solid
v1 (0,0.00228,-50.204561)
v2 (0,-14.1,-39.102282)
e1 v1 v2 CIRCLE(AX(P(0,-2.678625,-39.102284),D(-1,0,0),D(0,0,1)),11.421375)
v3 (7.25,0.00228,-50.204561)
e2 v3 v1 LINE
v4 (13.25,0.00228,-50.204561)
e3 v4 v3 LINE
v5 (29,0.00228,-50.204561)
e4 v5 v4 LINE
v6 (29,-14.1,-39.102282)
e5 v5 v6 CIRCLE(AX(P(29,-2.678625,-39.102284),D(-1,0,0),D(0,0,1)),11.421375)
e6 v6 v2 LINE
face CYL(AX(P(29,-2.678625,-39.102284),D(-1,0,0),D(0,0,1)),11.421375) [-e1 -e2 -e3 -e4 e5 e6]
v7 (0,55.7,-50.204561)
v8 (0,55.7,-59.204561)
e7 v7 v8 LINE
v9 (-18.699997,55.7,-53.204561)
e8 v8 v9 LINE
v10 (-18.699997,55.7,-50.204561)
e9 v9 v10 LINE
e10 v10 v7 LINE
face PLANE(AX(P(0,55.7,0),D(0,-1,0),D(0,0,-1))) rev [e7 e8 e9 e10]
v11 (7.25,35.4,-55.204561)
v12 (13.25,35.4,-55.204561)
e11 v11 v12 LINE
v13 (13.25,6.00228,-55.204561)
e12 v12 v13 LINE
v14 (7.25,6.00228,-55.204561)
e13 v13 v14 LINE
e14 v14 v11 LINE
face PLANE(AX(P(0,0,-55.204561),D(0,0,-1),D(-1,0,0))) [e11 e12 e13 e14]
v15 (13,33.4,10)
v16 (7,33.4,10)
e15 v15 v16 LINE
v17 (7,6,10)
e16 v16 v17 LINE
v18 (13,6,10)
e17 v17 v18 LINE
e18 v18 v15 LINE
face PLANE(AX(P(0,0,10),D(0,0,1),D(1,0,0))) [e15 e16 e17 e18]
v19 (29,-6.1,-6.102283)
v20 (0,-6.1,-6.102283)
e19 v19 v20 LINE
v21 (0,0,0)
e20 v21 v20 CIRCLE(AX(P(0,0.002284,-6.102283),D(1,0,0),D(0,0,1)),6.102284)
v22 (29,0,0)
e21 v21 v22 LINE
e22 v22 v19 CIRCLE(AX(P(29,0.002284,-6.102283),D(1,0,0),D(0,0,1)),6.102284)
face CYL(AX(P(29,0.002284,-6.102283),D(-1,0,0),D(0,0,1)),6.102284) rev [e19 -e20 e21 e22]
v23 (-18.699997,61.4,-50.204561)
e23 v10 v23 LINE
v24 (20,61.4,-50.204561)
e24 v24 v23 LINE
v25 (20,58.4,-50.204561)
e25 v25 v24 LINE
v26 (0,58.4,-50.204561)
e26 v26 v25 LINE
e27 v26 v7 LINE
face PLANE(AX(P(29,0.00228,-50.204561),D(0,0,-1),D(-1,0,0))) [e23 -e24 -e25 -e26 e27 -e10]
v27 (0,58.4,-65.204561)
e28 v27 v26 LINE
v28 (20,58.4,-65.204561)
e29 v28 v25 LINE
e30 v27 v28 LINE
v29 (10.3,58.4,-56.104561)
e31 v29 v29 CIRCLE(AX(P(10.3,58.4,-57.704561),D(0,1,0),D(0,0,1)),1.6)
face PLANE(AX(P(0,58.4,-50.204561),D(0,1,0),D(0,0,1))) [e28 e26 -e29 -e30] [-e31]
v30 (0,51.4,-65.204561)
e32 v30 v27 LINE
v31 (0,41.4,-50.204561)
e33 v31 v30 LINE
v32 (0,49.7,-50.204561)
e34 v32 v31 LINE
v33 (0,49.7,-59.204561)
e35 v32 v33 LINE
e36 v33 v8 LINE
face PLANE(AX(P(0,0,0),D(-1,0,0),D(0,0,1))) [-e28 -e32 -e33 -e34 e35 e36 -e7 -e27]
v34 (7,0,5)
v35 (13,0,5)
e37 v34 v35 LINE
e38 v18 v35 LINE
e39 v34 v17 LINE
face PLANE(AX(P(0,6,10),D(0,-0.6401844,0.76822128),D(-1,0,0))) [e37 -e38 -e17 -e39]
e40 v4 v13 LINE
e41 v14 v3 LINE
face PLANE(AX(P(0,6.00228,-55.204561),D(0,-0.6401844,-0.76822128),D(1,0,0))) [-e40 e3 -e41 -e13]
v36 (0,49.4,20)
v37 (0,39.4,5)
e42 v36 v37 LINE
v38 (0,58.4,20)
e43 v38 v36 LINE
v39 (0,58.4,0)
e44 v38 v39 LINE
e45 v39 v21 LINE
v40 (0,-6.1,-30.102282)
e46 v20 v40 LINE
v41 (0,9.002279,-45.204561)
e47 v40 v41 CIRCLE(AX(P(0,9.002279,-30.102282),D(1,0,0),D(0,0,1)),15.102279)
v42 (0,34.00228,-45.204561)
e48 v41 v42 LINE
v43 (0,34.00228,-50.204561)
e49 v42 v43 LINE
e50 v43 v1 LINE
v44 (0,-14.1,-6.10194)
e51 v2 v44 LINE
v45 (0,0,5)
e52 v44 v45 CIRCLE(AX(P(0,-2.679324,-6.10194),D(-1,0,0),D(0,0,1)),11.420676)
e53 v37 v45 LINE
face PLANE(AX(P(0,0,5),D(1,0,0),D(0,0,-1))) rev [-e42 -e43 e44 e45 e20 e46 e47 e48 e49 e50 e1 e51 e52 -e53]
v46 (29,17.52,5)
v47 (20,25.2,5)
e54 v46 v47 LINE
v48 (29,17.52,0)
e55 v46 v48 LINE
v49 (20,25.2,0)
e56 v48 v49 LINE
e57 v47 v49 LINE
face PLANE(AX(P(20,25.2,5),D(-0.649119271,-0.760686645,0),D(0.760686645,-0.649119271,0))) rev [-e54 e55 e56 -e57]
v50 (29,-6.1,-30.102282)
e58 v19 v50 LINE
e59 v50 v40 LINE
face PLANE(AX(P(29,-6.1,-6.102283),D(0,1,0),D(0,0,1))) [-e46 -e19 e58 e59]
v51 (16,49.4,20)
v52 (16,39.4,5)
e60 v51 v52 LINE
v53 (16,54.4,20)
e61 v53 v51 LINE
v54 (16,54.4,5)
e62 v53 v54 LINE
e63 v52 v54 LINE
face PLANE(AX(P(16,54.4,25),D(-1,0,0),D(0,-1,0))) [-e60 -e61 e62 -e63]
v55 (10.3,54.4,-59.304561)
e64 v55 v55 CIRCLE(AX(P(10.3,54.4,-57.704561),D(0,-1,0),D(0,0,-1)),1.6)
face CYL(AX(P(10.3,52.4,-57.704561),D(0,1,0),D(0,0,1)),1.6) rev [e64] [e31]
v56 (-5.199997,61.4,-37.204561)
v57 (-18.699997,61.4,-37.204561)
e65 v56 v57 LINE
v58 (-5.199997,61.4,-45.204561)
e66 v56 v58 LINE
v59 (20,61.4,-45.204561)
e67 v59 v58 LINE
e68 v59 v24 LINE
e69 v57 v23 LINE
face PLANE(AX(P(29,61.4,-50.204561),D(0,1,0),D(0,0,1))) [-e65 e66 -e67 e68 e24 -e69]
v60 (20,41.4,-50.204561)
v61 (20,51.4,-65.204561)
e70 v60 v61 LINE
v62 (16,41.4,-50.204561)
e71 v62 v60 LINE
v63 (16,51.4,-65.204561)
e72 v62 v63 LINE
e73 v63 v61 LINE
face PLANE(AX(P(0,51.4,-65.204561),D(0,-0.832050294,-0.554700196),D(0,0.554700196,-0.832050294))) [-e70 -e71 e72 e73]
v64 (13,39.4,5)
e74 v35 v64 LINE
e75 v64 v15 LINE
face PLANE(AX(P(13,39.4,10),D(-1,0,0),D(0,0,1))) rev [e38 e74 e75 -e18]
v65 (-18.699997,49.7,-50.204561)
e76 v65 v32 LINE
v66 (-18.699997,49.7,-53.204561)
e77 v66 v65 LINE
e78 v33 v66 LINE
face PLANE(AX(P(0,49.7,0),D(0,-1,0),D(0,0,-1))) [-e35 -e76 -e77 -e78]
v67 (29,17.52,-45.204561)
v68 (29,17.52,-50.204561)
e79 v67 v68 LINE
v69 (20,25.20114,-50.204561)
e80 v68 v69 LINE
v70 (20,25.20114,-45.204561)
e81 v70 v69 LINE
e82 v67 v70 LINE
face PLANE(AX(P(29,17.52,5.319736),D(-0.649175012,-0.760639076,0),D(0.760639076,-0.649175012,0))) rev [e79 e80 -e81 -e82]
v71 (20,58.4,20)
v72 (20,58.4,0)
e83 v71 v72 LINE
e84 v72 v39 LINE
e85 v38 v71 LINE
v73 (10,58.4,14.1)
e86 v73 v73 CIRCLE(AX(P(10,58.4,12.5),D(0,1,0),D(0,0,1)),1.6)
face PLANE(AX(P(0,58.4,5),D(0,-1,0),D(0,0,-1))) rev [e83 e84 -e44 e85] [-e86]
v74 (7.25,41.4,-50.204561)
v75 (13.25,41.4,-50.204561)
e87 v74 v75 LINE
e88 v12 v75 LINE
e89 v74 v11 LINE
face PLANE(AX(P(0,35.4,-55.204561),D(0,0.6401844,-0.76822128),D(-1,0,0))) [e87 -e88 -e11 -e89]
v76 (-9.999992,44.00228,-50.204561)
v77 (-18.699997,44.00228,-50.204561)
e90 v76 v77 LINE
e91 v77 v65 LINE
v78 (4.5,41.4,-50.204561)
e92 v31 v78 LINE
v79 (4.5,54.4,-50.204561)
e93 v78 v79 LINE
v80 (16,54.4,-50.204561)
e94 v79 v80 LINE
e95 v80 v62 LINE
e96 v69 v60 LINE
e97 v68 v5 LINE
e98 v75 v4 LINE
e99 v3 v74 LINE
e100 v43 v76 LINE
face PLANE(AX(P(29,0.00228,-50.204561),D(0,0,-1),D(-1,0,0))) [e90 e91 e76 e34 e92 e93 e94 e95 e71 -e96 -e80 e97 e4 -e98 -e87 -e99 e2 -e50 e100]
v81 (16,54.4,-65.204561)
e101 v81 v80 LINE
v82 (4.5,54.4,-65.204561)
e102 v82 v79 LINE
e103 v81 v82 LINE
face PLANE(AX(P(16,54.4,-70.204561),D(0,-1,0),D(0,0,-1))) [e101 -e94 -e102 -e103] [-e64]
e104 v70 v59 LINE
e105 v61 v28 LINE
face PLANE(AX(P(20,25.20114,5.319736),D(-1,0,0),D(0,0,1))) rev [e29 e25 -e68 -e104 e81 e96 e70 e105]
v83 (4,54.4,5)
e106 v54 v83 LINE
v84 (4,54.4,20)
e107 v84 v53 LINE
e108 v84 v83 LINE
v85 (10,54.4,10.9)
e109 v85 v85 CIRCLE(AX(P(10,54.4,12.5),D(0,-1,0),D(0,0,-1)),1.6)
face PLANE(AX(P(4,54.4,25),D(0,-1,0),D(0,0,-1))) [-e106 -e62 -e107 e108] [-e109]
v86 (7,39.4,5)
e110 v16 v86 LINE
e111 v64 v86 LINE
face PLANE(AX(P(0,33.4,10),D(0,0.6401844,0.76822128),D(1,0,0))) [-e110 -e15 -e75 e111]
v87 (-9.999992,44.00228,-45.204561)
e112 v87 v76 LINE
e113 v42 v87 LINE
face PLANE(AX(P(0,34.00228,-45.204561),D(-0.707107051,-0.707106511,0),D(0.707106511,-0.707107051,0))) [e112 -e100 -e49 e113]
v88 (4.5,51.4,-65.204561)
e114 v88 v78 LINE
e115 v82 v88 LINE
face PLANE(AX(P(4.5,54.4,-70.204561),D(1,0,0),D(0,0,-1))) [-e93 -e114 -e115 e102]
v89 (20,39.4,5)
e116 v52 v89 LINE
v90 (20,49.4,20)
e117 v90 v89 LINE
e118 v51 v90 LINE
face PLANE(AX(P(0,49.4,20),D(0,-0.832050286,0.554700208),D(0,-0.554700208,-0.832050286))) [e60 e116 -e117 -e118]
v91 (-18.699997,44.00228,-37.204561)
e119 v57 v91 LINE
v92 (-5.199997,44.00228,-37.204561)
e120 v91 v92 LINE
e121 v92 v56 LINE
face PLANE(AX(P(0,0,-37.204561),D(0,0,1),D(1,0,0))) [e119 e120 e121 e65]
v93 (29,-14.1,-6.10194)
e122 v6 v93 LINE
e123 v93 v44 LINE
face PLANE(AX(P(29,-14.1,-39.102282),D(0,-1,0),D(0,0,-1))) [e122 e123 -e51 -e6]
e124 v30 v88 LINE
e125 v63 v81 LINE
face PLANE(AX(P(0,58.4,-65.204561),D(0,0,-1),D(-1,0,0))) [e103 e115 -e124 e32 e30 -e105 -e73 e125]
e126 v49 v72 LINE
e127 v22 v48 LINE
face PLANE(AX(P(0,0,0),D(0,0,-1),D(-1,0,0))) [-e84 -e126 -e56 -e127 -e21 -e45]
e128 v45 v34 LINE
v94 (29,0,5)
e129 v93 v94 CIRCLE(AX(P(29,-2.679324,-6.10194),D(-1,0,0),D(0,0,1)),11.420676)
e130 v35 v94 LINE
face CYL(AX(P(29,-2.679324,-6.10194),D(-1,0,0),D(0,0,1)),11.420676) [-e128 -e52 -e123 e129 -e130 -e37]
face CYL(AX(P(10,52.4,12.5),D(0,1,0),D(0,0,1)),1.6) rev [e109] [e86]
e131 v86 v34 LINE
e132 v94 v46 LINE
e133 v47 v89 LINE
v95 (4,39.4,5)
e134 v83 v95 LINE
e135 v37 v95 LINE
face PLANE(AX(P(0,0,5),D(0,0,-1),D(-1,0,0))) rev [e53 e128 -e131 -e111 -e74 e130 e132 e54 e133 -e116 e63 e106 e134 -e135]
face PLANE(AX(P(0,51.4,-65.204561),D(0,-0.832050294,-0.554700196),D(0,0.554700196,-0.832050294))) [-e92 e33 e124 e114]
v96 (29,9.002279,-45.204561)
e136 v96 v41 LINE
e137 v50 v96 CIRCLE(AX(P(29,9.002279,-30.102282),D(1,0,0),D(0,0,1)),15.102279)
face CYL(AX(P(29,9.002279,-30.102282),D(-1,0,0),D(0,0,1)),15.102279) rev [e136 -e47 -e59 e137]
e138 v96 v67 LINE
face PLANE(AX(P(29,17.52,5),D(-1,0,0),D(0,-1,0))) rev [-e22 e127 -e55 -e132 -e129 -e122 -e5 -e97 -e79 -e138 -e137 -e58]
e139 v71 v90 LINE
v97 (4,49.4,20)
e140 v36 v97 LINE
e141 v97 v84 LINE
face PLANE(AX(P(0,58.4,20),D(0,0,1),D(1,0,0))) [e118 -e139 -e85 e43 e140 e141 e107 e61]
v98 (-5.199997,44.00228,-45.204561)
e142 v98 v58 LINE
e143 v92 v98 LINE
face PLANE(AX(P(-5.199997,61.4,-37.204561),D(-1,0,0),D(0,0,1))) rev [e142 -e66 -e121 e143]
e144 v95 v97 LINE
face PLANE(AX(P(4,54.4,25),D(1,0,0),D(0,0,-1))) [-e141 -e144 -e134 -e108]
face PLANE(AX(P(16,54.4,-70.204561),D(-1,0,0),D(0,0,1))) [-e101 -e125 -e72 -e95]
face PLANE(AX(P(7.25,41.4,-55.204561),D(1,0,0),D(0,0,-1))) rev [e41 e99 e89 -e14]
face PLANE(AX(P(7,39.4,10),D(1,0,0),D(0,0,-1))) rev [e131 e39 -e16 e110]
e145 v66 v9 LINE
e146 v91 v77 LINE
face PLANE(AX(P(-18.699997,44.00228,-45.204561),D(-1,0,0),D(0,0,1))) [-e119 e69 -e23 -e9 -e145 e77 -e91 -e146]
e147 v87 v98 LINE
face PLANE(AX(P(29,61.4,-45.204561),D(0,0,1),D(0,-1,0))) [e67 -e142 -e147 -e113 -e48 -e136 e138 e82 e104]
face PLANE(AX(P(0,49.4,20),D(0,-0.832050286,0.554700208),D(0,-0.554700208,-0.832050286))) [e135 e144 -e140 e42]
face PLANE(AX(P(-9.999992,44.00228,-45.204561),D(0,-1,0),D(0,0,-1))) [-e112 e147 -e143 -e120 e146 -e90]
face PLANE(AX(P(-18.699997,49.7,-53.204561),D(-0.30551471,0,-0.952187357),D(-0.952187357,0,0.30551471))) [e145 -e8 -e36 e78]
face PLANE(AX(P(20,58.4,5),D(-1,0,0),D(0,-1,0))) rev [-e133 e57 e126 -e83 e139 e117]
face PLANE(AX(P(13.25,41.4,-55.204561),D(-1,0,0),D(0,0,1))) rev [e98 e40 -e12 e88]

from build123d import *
from OCP.BRepFilletAPI import BRepFilletAPI_MakeChamfer

# Parameters (mm, degrees)
RESSALTO_EXTRUS_O1_DEPTH = 5
RESSALTO_EXTRUS_O2_DEPTH = 29
CORTE_EXTRUS_O1_REACH    = 89.714
RESSALTO_EXTRUS_O3_DEPTH = 5
ESBO_O5_W                = 13.5
ESBO_O5_H                = 17.397720337
RESSALTO_EXTRUS_O4_DEPTH = 8
RESSALTO_EXTRUS_O5_DEPTH = 20
ESBO_O7_W                = 11.5
ESBO_O7_H                = 13
CORTE_EXTRUS_O2_DEPTH    = 20
RESSALTO_EXTRUS_O6_DEPTH = 20
ESBO_O9_W                = 12
ESBO_O9_H                = 15
CORTE_EXTRUS_O3_DEPTH    = 20
ESBO_O11_W               = 6
ESBO_O11_H               = 39.4
RESSALTO_EXTRUS_O7_DEPTH = 5
ESBO_O12_W               = 6
ESBO_O12_H               = 41.397720337
RESSALTO_EXTRUS_O8_DEPTH = 5
CHANFRO1_SIZE            = 5
CHANFRO1_SIZE_2          = 6
RESSALTO_EXTRUS_O9_START = -5.7
RESSALTO_EXTRUS_O9_DEPTH = 6
ESBO_O14_R               = 1.6
CORTE_EXTRUS_O4_DEPTH    = 6


with BuildPart() as part:
    # Esboço1 → Ressalto-extrusão1 (new body)
    with BuildSketch(Plane.XY):
        Polygon((0, 0), (0, 58.4), (20, 58.4), (20, 25.2), (29, 17.52), (29, 0), align=None)
    extrude(amount=RESSALTO_EXTRUS_O1_DEPTH)

    # Esboço2 → Ressalto-extrusão2 (add)
    with BuildSketch(Plane.ZY):
        with BuildLine():
            Line((0, 0), (5, 0))
            ThreePointArc((5, 0), (2.871117767, -9.744454942), (-6.101940178, -14.1))
            Line((-6.101940178, -14.1), (-39.10228157, -14.1))
            ThreePointArc((-39.10228157, -14.1), (-48.076340899, -9.74361665), (-50.204561234, 0.002279663))
            Line((-50.204561234, 0.002279663), (-50.204561234, 61.4))
            Line((-50.204561234, 61.4), (-45.204561234, 61.4))
            Line((-45.204561234, 61.4), (-45.204561234, 9.002278982))
            ThreePointArc((-45.204561234, 9.002278982), (-40.78120589, -1.676645138), (-30.10228157, -6.1))
            Line((-30.10228157, -6.1), (-6.102283186, -6.1))
            ThreePointArc((-6.102283186, -6.1), (-1.788124517, -4.313489814), (0, 0))
        make_face()
    extrude(amount=-RESSALTO_EXTRUS_O2_DEPTH)

    # Esboço3 → Corte-extrusão1 (cut, up to next)
    with BuildSketch(Plane(origin=(0, 0, -50.204561234), x_dir=(-1, 0, 0), z_dir=(0, 0, -1)), mode=Mode.PRIVATE) as corte_extrus_o1_sk1:
        Polygon((-29, 17.52), (-20, 25.201139832), (-20, 61.4), (-29, 61.4), align=None)
    corte_extrus_o1_tool1 = extrude(corte_extrus_o1_sk1.sketch, amount=-CORTE_EXTRUS_O1_REACH, mode=Mode.PRIVATE) & part.part
    add(corte_extrus_o1_tool1.solids().sort_by_distance((24.64388, 41.318887, -50.204561))[0], mode=Mode.SUBTRACT)

    # Esboço4 → Ressalto-extrusão3 (add)
    with BuildSketch(Plane(origin=(0, 0, -50.204561234), x_dir=(-1, 0, 0), z_dir=(0, 0, -1))):
        Polygon((0, 34.002279663), (9.999992371, 44.002279663), (18.699996948, 44.002279663), (18.699996948, 61.4), (0, 61.4), align=None)
    extrude(amount=-RESSALTO_EXTRUS_O3_DEPTH)

    # Esboço5 → Ressalto-extrusão4 (add)
    with BuildSketch(Plane.XY.offset(-45.204561234)):
        with Locations((-11.949996948, 52.701139832)):
            Rectangle(ESBO_O5_W, ESBO_O5_H)
    extrude(amount=RESSALTO_EXTRUS_O4_DEPTH)

    # Esboço6 → Ressalto-extrusão5 (add)
    with BuildSketch(Plane(origin=(20, 0, 0), x_dir=(0, 0, -1), z_dir=(1, 0, 0))):
        Polygon((50.204561234, 58.4), (65.204561234, 58.4), (65.204561234, 51.4), (50.204561234, 41.4), align=None)
    extrude(amount=-RESSALTO_EXTRUS_O5_DEPTH)

    # Esboço7 → Corte-extrusão2 (cut)
    with BuildSketch(Plane(origin=(0, 0, -50.204561234), x_dir=(-1, 0, 0), z_dir=(0, 0, -1))):
        with Locations((-10.25, 47.9)):
            Rectangle(ESBO_O7_W, ESBO_O7_H)
    extrude(amount=CORTE_EXTRUS_O2_DEPTH, mode=Mode.SUBTRACT)

    # Esboço8 → Ressalto-extrusão6 (add)
    with BuildSketch(Plane(origin=(20, 0, 0), x_dir=(0, 0, -1), z_dir=(1, 0, 0))):
        Polygon((-5, 58.4), (-19.999999523, 58.4), (-19.999999523, 49.4), (-5, 39.4), align=None)
    extrude(amount=-RESSALTO_EXTRUS_O6_DEPTH)

    # Esboço9 → Corte-extrusão3 (cut)
    with BuildSketch(Plane.XY.offset(5)):
        with Locations((10, 46.9)):
            Rectangle(ESBO_O9_W, ESBO_O9_H)
    extrude(amount=CORTE_EXTRUS_O3_DEPTH, mode=Mode.SUBTRACT)

    # Esboço11 → Ressalto-extrusão7 (add)
    with BuildSketch(Plane.XY.offset(5)):
        with Locations((10, 19.7)):
            Rectangle(ESBO_O11_W, ESBO_O11_H)
    extrude(amount=RESSALTO_EXTRUS_O7_DEPTH)

    # Esboço12 → Ressalto-extrusão8 (add)
    with BuildSketch(Plane(origin=(0, 0, -50.204561234), x_dir=(-1, 0, 0), z_dir=(0, 0, -1))):
        with Locations((-10.25, 20.701139832)):
            Rectangle(ESBO_O12_W, ESBO_O12_H)
    extrude(amount=RESSALTO_EXTRUS_O8_DEPTH)

    # Chanfro1
    chanfro1_edges_1 = [part.edges().sort_by_distance(p)[0] for p in [
        (10, 0, 10),
    ]]
    chanfro1_side_1 = [part.faces().sort_by_distance(p)[0] for p in [
        (10, 0, 9.9),
    ]]
    chanfro1_edges_2 = [part.edges().sort_by_distance(p)[0] for p in [
        (10, 39.4, 10),
    ]]
    chanfro1_side_2 = [part.faces().sort_by_distance(p)[0] for p in [
        (10, 39.4, 9.9),
    ]]
    chanfro1_edges_3 = [part.edges().sort_by_distance(p)[0] for p in [
        (10.25, 0.002279663, -55.204561234),
    ]]
    chanfro1_side_3 = [part.faces().sort_by_distance(p)[0] for p in [
        (10.25, 0.002279663, -55.104561234),
    ]]
    chanfro1_edges_4 = [part.edges().sort_by_distance(p)[0] for p in [
        (10.25, 41.4, -55.204561234),
    ]]
    chanfro1_side_4 = [part.faces().sort_by_distance(p)[0] for p in [
        (10.25, 41.4, -55.104561234),
    ]]
    chanfro1 = BRepFilletAPI_MakeChamfer(part.part.solid().wrapped)
    for e in chanfro1_edges_1:
        chanfro1.Add(CHANFRO1_SIZE - 0.0001, CHANFRO1_SIZE_2 - 0.0001, e.wrapped, chanfro1_side_1[0].wrapped)
    for e in chanfro1_edges_2:
        chanfro1.Add(CHANFRO1_SIZE - 0.0001, CHANFRO1_SIZE_2 - 0.0001, e.wrapped, chanfro1_side_2[0].wrapped)
    for e in chanfro1_edges_3:
        chanfro1.Add(CHANFRO1_SIZE - 0.0001, CHANFRO1_SIZE_2 - 0.0001, e.wrapped, chanfro1_side_3[0].wrapped)
    for e in chanfro1_edges_4:
        chanfro1.Add(CHANFRO1_SIZE - 0.0001, CHANFRO1_SIZE_2 - 0.0001, e.wrapped, chanfro1_side_4[0].wrapped)
    add(Compound.cast(chanfro1.Shape()), mode=Mode.REPLACE)  # a hair under: the kernel refuses the full size

    # Esboço13 → Ressalto-extrusão9 (add)
    with BuildSketch(Plane(origin=(0, 61.4, 0), x_dir=(1, 0, 0), z_dir=(0, 1, 0)).offset(RESSALTO_EXTRUS_O9_START)):
        Polygon((-18.699996948, 50.204561234), (-18.699996948, 53.204561234), (0, 59.204561234), (0, 50.204561234), align=None)
    extrude(amount=-RESSALTO_EXTRUS_O9_DEPTH)

    # Esboço14 → Corte-extrusão4 (cut)
    with BuildSketch(Plane(origin=(0, 58.4, 0), x_dir=(1, 0, 0), z_dir=(0, 1, 0))):
        with Locations(Location((10.3, 57.704561234, 0), (0, 0, 270))):
            Circle(ESBO_O14_R)
        with Locations(Location((10, -12.499999523, 0), (0, 0, 270))):
            Circle(ESBO_O14_R)
    extrude(amount=-CORTE_EXTRUS_O4_DEPTH, mode=Mode.SUBTRACT)


solid = part.part
